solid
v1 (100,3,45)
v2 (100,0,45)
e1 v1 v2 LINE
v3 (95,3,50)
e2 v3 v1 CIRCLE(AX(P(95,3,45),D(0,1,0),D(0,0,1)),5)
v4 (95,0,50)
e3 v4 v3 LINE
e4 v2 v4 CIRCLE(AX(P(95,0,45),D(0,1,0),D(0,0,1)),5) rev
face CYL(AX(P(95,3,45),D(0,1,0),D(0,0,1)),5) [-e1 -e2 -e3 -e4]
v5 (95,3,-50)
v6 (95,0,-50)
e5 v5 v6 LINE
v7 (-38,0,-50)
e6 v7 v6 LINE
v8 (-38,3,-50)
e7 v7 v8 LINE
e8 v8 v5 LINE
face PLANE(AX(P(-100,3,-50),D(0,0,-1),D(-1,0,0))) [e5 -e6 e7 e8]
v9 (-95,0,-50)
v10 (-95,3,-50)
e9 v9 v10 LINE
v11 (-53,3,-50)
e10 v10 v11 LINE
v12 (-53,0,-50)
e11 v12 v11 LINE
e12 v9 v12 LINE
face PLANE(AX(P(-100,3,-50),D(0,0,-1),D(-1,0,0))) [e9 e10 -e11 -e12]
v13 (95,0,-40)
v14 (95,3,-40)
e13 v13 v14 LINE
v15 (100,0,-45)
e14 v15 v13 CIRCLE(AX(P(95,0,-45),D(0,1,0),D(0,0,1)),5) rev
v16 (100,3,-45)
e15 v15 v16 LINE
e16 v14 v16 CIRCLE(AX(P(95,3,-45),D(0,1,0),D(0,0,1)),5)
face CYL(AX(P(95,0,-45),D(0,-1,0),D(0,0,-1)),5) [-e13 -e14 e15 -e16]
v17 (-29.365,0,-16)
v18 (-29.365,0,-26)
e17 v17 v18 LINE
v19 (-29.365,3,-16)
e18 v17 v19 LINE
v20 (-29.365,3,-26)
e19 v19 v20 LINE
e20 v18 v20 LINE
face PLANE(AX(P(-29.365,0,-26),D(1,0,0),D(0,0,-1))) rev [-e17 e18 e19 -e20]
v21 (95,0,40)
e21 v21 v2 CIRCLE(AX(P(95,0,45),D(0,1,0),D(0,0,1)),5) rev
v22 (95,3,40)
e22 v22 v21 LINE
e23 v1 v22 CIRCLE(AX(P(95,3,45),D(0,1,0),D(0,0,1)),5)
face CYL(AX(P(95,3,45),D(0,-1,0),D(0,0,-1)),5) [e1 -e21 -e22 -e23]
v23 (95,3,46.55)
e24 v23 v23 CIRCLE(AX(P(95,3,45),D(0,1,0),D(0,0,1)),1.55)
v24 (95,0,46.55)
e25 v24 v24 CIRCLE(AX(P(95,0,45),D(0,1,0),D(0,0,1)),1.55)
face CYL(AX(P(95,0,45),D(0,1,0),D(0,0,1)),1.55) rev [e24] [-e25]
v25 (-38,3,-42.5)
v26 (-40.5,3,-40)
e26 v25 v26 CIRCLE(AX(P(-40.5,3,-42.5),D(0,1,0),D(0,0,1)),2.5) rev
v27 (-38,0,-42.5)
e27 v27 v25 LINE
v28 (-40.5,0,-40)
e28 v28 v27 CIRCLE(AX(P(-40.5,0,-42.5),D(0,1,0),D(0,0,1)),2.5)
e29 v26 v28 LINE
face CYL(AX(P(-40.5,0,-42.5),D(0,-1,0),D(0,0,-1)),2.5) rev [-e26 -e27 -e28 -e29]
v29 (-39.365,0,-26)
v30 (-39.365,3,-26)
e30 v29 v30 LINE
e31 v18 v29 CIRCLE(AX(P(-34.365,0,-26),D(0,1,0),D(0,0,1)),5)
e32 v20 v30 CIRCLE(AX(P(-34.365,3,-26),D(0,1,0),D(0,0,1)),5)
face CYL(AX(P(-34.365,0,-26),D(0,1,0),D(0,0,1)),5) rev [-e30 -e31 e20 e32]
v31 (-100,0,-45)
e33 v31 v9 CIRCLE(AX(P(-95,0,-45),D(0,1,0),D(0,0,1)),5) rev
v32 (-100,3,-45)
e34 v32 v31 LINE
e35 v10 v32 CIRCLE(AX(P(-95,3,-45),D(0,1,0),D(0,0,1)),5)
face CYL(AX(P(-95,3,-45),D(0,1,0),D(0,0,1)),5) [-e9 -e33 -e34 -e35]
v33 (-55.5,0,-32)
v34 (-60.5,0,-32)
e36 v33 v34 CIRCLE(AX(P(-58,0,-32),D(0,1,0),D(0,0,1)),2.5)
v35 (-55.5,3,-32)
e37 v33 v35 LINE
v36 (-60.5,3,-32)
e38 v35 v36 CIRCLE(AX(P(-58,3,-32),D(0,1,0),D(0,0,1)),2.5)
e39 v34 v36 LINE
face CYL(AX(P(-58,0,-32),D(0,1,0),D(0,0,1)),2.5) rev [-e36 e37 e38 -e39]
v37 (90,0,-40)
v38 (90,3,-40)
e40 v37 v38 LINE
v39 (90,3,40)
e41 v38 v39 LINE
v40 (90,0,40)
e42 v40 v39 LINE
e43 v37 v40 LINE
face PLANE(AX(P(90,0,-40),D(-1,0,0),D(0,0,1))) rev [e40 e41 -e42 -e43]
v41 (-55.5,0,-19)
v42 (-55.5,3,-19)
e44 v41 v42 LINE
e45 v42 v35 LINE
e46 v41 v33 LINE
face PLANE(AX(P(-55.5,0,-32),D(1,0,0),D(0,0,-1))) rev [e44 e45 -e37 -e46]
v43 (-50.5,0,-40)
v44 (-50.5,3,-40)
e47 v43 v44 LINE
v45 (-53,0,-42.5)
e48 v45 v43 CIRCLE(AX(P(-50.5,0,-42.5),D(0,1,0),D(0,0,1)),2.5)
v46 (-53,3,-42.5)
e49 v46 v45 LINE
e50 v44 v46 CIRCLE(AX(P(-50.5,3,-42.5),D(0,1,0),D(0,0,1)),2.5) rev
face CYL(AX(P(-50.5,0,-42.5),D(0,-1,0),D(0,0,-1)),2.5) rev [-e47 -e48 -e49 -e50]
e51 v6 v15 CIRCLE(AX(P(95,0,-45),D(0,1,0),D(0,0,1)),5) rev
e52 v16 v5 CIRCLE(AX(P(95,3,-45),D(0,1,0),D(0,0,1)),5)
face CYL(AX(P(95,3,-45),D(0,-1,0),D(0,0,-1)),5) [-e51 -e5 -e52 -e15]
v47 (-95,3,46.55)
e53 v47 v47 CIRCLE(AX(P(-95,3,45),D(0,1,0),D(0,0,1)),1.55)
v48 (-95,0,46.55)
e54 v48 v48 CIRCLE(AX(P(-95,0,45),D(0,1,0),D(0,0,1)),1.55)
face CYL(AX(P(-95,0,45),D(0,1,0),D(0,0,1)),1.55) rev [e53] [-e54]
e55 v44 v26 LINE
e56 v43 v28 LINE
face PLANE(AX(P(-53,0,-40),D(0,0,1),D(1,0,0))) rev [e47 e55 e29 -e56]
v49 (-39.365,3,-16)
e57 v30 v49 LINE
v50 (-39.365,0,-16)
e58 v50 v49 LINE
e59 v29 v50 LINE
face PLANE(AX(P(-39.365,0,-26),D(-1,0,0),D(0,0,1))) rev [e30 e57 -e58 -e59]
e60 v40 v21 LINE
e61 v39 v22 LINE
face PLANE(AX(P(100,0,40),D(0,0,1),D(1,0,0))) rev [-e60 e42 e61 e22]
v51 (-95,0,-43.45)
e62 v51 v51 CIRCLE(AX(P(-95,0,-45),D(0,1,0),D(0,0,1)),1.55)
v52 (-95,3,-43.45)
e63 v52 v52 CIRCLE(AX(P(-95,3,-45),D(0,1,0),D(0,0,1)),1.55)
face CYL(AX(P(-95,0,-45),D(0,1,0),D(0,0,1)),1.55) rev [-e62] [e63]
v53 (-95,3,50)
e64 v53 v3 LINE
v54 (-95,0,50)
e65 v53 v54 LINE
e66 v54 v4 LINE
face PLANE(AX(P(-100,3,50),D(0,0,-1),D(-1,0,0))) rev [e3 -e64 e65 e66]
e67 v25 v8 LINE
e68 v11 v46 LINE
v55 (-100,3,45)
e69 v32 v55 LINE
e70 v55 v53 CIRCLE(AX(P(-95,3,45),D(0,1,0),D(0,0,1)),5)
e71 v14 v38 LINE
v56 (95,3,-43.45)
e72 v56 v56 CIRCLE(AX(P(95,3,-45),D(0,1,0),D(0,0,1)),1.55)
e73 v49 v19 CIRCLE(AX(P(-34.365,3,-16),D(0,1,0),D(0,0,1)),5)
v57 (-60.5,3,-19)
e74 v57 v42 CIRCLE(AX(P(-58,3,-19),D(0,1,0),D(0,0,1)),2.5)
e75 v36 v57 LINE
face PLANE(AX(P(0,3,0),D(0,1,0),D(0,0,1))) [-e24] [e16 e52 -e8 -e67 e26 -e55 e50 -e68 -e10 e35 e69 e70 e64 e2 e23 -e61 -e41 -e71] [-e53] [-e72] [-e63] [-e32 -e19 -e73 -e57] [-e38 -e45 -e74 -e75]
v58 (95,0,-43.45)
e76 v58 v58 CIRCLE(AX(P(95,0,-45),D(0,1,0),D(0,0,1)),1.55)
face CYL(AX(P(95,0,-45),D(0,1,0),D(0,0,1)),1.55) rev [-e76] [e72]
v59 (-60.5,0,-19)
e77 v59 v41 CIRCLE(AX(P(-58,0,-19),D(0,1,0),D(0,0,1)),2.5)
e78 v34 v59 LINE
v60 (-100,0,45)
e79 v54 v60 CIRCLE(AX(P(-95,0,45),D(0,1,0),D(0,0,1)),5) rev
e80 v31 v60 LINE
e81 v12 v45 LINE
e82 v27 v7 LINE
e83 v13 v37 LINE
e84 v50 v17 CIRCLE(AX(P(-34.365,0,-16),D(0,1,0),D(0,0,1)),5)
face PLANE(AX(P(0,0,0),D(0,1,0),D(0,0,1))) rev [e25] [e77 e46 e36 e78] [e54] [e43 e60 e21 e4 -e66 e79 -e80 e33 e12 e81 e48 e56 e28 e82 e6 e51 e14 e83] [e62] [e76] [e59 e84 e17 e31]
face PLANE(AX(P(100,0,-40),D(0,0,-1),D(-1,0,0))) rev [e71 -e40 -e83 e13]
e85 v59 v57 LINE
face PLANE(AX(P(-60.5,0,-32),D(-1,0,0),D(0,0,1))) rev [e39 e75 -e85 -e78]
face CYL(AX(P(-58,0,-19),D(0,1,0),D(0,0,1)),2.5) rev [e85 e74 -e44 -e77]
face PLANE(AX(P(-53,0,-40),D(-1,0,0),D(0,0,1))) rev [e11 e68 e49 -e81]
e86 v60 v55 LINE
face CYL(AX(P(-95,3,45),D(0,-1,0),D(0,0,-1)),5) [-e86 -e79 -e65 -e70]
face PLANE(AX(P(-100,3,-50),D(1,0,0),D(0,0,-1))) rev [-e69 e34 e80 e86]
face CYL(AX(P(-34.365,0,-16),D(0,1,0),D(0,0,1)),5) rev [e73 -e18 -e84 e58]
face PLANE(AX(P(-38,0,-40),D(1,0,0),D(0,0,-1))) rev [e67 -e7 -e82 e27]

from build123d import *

# Parameters (mm, degrees)
SKETCH1_W           = 200
SKETCH1_H           = 100
BOSS_EXTRUDE1_DEPTH = 3
SKETCH2_R           = 1.55
CUT_EXTRUDE1_DEPTH  = 112.843640856
FILLET1_R           = 5
SKETCH3_W           = 10
SKETCH3_H           = 80
SKETCH3_W_2         = 15
SKETCH3_H_2         = 10
CUT_EXTRUDE2_DEPTH  = 112.843640856
FILLET2_R           = 5
FILLET4_R           = 2.5


with BuildPart() as part:
    # Sketch1 → Boss-Extrude1 (new body)
    with BuildSketch(Plane(origin=(0, 0, 0), x_dir=(1, 0, 0), z_dir=(0, 1, 0))):
        Rectangle(SKETCH1_W, SKETCH1_H)
    extrude(amount=BOSS_EXTRUDE1_DEPTH)

    # Sketch2 → Cut-Extrude1 (cut, through all)
    with BuildSketch(Plane(origin=(0, 3, 0), x_dir=(1, 0, 0), z_dir=(0, 1, 0))):
        with Locations(Location((-95, 45, 0), (0, 0, 270))):
            Circle(SKETCH2_R)
        with Locations(Location((-95, -45, 0), (0, 0, 270))):
            Circle(SKETCH2_R)
        with Locations(Location((95, 45, 0), (0, 0, 270))):
            Circle(SKETCH2_R)
        with Locations(Location((95, -45, 0), (0, 0, 270))):
            Circle(SKETCH2_R)
    extrude(amount=-CUT_EXTRUDE1_DEPTH, mode=Mode.SUBTRACT)

    # Fillet1
    fillet1_edges = [part.edges().sort_by_distance(p)[0] for p in [
        (-100, 1.5, -50),
        (100, 1.5, -50),
        (100, 1.5, 50),
        (-100, 1.5, 50),
    ]]
    fillet(fillet1_edges, radius=FILLET1_R)

    # Sketch3 → Cut-Extrude2 (cut, through all)
    with BuildSketch(Plane(origin=(0, 3, 0), x_dir=(1, 0, 0), z_dir=(0, 1, 0))):
        with Locations((95, 0)):
            Rectangle(SKETCH3_W, SKETCH3_H)
        with BuildLine():
            Line((-55.5, 32), (-55.5, 19))
            ThreePointArc((-55.5, 19), (-58, 16.5), (-60.5, 19))
            Line((-60.5, 19), (-60.5, 32))
            ThreePointArc((-60.5, 32), (-58, 34.5), (-55.5, 32))
        make_face()
        with BuildLine():
            Line((-29.365, 26), (-29.365, 16))
            ThreePointArc((-29.365, 16), (-34.365, 11), (-39.365, 16))
            Line((-39.365, 16), (-39.365, 26))
            ThreePointArc((-39.365, 26), (-34.365, 31), (-29.365, 26))
        make_face()
        with Locations((-45.5, 45)):
            Rectangle(SKETCH3_W_2, SKETCH3_H_2)
    extrude(amount=-CUT_EXTRUDE2_DEPTH, mode=Mode.SUBTRACT)

    # Fillet2
    fillet2_edges = [part.edges().sort_by_distance(p)[0] for p in [
        (100, 1.5, 40),
        (100, 1.5, -40),
    ]]
    fillet(fillet2_edges, radius=FILLET2_R - 0.0001)  # a hair under: the kernel refuses the full size

    # Fillet4
    fillet4_edges = [part.edges().sort_by_distance(p)[0] for p in [
        (-38, 1.5, -40),
        (-53, 1.5, -40),
    ]]
    fillet(fillet4_edges, radius=FILLET4_R)


solid = part.part
